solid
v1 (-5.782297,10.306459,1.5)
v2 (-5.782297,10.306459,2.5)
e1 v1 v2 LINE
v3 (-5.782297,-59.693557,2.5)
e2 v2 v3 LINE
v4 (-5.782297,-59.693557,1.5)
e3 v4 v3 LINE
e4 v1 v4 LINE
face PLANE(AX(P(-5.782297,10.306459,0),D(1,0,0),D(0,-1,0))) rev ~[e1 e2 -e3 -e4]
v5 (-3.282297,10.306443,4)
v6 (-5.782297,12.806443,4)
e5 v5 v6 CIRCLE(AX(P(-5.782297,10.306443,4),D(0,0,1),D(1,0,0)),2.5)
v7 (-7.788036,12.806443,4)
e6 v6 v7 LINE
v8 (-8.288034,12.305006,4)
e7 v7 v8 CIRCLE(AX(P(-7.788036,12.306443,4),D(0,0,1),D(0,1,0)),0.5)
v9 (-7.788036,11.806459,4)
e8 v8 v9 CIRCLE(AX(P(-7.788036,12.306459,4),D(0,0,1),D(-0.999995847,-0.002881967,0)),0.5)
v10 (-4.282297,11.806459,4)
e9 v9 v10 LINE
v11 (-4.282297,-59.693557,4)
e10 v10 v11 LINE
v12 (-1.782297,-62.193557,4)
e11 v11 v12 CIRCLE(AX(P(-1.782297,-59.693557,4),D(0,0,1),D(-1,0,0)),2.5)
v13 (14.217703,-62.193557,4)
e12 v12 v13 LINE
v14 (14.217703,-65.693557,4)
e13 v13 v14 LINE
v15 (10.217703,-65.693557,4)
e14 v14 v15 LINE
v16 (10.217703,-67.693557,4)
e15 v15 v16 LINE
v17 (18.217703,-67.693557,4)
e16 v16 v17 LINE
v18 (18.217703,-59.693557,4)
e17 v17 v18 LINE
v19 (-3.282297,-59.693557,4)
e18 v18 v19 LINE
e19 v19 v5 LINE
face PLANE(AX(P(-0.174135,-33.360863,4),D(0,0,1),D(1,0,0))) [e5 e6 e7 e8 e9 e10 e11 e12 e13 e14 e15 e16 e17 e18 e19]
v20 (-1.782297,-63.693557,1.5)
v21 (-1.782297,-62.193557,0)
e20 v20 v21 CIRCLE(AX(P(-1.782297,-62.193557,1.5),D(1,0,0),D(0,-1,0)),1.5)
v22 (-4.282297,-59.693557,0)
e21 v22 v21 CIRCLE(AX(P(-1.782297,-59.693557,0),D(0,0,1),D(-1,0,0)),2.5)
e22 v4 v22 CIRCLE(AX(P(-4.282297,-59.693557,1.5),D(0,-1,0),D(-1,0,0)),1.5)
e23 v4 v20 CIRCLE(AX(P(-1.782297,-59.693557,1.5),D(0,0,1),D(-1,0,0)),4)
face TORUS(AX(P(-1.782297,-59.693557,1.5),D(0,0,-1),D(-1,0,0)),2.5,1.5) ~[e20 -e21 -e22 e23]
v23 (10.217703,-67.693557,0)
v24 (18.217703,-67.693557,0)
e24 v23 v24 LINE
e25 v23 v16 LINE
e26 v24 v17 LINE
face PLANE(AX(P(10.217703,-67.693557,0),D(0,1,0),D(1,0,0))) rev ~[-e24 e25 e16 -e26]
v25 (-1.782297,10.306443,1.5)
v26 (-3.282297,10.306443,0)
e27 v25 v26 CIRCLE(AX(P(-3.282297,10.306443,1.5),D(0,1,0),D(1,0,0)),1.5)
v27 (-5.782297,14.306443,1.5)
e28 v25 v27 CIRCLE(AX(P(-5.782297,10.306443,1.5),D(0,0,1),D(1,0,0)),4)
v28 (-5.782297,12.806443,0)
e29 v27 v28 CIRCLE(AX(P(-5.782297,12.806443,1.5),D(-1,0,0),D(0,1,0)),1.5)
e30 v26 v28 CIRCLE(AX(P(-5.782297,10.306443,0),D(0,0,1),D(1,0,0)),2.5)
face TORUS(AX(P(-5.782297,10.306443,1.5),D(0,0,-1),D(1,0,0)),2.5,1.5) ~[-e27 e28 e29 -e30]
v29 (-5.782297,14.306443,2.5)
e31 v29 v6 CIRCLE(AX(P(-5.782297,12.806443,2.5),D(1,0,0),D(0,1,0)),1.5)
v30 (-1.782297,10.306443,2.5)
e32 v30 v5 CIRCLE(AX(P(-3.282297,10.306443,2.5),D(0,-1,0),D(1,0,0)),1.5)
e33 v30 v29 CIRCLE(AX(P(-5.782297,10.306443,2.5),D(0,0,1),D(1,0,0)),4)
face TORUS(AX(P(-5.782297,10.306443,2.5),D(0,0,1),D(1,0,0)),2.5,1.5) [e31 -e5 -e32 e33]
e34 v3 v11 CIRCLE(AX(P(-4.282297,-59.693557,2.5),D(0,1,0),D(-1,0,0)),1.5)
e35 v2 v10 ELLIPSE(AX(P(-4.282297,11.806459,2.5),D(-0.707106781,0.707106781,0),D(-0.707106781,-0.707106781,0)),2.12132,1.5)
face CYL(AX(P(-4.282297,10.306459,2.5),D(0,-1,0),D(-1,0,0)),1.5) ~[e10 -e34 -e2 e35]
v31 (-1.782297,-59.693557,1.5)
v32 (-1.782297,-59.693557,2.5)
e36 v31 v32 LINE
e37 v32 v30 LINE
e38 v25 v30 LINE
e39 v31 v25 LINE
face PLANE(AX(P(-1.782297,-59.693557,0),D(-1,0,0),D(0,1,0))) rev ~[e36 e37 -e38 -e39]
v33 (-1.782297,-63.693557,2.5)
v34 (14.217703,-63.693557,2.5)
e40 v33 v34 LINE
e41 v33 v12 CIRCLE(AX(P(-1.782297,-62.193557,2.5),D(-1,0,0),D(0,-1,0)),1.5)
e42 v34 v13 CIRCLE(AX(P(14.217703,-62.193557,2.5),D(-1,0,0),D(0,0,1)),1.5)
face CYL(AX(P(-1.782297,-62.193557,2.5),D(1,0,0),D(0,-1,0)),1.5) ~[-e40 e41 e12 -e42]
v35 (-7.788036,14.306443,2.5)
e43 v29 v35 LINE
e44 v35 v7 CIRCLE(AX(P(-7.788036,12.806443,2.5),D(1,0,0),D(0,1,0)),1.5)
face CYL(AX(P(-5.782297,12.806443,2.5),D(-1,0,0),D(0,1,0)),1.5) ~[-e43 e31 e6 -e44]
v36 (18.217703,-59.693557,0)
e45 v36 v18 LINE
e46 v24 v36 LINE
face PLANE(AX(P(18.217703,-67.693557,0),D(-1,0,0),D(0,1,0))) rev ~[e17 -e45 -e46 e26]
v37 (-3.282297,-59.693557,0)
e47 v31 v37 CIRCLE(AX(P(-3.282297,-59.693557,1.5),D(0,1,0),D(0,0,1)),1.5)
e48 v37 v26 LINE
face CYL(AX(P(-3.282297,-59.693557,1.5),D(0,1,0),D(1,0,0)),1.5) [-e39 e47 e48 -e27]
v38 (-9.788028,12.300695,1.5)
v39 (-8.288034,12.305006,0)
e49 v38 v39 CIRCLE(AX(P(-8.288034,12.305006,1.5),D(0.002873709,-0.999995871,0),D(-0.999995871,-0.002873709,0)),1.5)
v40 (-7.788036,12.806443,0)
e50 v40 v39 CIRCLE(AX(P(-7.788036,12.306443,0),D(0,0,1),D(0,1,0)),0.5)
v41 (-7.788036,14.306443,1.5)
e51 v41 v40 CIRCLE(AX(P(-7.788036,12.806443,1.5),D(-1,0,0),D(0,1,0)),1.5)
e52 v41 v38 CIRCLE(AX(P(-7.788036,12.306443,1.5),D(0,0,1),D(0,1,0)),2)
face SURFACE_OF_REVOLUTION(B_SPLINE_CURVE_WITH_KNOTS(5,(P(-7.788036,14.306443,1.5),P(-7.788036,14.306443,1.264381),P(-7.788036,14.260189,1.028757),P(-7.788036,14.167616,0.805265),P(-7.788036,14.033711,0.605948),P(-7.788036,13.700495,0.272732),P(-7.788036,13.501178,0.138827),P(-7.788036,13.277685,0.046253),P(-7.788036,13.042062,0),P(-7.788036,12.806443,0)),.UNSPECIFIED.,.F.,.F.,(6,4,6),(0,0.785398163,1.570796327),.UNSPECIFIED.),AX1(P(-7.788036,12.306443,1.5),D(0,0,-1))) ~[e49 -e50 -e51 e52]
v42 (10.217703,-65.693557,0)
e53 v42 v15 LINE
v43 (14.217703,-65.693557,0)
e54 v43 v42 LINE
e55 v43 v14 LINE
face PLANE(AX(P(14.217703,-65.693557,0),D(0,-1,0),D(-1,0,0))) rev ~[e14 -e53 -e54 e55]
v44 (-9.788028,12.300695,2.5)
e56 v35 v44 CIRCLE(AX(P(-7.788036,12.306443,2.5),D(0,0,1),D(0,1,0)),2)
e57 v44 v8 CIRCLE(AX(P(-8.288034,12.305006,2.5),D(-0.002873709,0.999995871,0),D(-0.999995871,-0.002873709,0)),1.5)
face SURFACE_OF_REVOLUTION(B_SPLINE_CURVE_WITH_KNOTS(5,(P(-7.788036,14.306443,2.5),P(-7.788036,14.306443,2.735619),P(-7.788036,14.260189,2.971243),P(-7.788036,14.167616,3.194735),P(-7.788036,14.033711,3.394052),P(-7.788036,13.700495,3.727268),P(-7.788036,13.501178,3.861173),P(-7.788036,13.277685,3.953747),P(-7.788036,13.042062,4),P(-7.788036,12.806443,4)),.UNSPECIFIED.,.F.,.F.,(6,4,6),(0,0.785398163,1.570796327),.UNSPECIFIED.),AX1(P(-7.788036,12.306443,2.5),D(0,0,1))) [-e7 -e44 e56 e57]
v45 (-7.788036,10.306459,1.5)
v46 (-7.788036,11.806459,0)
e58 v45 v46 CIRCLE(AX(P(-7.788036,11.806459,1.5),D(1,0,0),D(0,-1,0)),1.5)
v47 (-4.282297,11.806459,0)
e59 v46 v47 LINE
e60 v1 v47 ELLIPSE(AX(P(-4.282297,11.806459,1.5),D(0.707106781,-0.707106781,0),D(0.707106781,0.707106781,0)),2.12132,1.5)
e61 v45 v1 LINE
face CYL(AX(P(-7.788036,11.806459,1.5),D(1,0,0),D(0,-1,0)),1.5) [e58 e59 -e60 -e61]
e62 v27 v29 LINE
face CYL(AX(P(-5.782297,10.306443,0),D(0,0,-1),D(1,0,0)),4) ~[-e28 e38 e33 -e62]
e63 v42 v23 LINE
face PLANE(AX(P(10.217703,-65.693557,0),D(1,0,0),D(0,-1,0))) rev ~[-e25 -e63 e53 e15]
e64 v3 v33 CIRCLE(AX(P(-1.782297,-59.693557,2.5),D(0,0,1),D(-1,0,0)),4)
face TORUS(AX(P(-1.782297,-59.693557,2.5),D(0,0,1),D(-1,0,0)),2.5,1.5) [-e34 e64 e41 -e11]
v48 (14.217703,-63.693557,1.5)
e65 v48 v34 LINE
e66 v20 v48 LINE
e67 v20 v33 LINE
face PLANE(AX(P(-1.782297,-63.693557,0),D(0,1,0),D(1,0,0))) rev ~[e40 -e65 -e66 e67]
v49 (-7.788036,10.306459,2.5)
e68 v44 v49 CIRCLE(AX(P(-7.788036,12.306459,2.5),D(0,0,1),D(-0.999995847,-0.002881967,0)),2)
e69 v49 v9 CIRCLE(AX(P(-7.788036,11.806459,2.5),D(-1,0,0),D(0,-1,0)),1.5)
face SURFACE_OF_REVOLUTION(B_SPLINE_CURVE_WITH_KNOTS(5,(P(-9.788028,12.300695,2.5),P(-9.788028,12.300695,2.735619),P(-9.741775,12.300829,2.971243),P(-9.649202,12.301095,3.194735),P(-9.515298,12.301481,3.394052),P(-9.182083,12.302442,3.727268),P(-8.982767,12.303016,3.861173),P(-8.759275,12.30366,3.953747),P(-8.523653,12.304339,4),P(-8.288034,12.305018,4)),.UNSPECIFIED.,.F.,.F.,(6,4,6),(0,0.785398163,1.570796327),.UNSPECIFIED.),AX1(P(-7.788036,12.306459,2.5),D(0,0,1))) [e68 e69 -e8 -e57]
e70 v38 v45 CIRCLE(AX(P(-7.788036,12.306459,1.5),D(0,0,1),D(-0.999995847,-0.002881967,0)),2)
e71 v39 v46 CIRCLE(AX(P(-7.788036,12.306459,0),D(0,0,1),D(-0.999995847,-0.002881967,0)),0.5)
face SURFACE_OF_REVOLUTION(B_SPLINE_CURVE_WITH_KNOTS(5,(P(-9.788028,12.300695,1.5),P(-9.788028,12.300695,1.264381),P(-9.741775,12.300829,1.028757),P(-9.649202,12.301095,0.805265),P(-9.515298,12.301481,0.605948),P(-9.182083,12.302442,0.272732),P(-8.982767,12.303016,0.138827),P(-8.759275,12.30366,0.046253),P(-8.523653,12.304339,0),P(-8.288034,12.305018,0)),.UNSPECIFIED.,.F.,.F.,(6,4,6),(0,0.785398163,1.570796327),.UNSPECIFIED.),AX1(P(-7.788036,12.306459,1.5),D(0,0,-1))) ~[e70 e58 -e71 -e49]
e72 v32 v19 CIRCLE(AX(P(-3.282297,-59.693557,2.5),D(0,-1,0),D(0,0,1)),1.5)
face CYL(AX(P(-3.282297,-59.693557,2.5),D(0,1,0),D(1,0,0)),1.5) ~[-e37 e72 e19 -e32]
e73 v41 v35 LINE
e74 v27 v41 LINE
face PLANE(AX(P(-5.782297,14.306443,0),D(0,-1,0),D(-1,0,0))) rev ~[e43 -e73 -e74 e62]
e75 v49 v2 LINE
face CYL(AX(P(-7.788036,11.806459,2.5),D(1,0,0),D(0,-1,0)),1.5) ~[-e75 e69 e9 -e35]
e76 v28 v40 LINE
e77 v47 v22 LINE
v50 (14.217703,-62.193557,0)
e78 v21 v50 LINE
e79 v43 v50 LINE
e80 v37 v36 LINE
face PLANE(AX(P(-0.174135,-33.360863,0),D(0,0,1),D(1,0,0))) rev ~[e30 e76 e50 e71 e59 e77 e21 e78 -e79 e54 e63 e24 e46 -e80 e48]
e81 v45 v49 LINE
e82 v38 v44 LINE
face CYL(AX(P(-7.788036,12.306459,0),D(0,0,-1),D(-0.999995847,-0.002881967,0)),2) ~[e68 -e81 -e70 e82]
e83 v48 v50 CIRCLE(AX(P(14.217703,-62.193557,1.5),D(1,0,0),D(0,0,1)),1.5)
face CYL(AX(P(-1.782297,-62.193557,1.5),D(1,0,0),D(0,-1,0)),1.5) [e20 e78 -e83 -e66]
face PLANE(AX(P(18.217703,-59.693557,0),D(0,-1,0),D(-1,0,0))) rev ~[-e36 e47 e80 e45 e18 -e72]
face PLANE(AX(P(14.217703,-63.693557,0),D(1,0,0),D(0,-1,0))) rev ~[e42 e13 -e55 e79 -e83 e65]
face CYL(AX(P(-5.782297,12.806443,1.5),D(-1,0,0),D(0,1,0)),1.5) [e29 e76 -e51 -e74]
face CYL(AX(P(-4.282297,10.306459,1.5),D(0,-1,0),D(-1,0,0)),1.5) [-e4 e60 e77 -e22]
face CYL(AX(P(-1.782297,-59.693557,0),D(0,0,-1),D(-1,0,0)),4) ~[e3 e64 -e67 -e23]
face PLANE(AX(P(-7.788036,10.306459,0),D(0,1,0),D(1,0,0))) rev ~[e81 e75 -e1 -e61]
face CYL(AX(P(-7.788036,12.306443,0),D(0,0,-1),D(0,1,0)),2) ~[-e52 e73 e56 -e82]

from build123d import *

# Parameters (mm, degrees)
F1_DEPTH = 4
F2_R     = 1.5


# Not quite as in the source:
# - ends of sketch curves that miss each other by under 0.0002 mm in the source are joined


with BuildPart() as f1:
    # F0 (on Top) → F1 (new body)
    with BuildSketch(Plane.XY):
        with BuildLine():
            Line((-5.7822973108, 10.3064593036), (-5.7822973108, 0))
            Line((-5.7822973108, 0), (-5.7822973108, -59.6935572128))
            ThreePointArc((-5.7822973108, -59.6935572128), (-4.6107244356, -62.5219843376), (-1.7822973108, -63.6935572128))
            Line((-1.7822973108, -63.6935572128), (14.2177026892, -63.6935572128))
            Line((14.2177026892, -63.6935572128), (14.2177026892, -65.6935572128))
            Line((14.2177026892, -65.6935572128), (10.2177026892, -65.6935572128))
            Line((10.2177026892, -65.6935572128), (10.2177026892, -67.6935572128))
            Line((10.2177026892, -67.6935572128), (18.2177026892, -67.6935572128))
            Line((18.2177026892, -67.6935572128), (18.2177026892, -59.6935572128))
            Line((18.2177026892, -59.6935572128), (-1.7822973108, -59.6935572128))
            Line((-1.7822973108, -59.6935572128), (-1.7822973108, 10.3064427872))
            ThreePointArc((-1.7822973108, 10.3064427872), (-2.9538701861, 13.1348699119), (-5.7822973108, 14.3064427872))
            Line((-5.7822973108, 14.3064427872), (-7.7880364463, 14.3064427872))
            ThreePointArc((-7.7880364463, 14.3064427872), (-9.2042805699, 13.7186228687), (-9.7880281881, 12.3006953697))
            ThreePointArc((-9.7880281881, 12.3006953697), (-9.2002165753, 10.8902151801), (-7.7880364938, 10.3064593036))
            Line((-7.7880364938, 10.3064593036), (-5.7822973108, 10.3064593036))
        make_face()
    extrude(amount=F1_DEPTH)

    # F2
    f2_edges = [f1.edges().sort_by_distance(p)[0] for p in [
        (-5.782297, -24.693549, 4),
        (-1.782297, -24.693557, 4),
        (-2.95387, 13.13487, 4),
        (-6.785167, 14.306443, 4),
        (-9.204281, 13.718623, 4),
        (-9.200211, 10.890209, 4),
        (-6.785167, 10.306459, 4),
        (-1.782297, -24.693557, 0),
        (-2.95387, 13.13487, 0),
        (-6.785167, 14.306443, 0),
        (-9.204281, 13.718623, 0),
        (-9.200211, 10.890209, 0),
        (-6.785167, 10.306459, 0),
        (-5.782297, -24.693549, 0),
    ]]
    fillet(f2_edges, radius=F2_R)


solid = f1.part
